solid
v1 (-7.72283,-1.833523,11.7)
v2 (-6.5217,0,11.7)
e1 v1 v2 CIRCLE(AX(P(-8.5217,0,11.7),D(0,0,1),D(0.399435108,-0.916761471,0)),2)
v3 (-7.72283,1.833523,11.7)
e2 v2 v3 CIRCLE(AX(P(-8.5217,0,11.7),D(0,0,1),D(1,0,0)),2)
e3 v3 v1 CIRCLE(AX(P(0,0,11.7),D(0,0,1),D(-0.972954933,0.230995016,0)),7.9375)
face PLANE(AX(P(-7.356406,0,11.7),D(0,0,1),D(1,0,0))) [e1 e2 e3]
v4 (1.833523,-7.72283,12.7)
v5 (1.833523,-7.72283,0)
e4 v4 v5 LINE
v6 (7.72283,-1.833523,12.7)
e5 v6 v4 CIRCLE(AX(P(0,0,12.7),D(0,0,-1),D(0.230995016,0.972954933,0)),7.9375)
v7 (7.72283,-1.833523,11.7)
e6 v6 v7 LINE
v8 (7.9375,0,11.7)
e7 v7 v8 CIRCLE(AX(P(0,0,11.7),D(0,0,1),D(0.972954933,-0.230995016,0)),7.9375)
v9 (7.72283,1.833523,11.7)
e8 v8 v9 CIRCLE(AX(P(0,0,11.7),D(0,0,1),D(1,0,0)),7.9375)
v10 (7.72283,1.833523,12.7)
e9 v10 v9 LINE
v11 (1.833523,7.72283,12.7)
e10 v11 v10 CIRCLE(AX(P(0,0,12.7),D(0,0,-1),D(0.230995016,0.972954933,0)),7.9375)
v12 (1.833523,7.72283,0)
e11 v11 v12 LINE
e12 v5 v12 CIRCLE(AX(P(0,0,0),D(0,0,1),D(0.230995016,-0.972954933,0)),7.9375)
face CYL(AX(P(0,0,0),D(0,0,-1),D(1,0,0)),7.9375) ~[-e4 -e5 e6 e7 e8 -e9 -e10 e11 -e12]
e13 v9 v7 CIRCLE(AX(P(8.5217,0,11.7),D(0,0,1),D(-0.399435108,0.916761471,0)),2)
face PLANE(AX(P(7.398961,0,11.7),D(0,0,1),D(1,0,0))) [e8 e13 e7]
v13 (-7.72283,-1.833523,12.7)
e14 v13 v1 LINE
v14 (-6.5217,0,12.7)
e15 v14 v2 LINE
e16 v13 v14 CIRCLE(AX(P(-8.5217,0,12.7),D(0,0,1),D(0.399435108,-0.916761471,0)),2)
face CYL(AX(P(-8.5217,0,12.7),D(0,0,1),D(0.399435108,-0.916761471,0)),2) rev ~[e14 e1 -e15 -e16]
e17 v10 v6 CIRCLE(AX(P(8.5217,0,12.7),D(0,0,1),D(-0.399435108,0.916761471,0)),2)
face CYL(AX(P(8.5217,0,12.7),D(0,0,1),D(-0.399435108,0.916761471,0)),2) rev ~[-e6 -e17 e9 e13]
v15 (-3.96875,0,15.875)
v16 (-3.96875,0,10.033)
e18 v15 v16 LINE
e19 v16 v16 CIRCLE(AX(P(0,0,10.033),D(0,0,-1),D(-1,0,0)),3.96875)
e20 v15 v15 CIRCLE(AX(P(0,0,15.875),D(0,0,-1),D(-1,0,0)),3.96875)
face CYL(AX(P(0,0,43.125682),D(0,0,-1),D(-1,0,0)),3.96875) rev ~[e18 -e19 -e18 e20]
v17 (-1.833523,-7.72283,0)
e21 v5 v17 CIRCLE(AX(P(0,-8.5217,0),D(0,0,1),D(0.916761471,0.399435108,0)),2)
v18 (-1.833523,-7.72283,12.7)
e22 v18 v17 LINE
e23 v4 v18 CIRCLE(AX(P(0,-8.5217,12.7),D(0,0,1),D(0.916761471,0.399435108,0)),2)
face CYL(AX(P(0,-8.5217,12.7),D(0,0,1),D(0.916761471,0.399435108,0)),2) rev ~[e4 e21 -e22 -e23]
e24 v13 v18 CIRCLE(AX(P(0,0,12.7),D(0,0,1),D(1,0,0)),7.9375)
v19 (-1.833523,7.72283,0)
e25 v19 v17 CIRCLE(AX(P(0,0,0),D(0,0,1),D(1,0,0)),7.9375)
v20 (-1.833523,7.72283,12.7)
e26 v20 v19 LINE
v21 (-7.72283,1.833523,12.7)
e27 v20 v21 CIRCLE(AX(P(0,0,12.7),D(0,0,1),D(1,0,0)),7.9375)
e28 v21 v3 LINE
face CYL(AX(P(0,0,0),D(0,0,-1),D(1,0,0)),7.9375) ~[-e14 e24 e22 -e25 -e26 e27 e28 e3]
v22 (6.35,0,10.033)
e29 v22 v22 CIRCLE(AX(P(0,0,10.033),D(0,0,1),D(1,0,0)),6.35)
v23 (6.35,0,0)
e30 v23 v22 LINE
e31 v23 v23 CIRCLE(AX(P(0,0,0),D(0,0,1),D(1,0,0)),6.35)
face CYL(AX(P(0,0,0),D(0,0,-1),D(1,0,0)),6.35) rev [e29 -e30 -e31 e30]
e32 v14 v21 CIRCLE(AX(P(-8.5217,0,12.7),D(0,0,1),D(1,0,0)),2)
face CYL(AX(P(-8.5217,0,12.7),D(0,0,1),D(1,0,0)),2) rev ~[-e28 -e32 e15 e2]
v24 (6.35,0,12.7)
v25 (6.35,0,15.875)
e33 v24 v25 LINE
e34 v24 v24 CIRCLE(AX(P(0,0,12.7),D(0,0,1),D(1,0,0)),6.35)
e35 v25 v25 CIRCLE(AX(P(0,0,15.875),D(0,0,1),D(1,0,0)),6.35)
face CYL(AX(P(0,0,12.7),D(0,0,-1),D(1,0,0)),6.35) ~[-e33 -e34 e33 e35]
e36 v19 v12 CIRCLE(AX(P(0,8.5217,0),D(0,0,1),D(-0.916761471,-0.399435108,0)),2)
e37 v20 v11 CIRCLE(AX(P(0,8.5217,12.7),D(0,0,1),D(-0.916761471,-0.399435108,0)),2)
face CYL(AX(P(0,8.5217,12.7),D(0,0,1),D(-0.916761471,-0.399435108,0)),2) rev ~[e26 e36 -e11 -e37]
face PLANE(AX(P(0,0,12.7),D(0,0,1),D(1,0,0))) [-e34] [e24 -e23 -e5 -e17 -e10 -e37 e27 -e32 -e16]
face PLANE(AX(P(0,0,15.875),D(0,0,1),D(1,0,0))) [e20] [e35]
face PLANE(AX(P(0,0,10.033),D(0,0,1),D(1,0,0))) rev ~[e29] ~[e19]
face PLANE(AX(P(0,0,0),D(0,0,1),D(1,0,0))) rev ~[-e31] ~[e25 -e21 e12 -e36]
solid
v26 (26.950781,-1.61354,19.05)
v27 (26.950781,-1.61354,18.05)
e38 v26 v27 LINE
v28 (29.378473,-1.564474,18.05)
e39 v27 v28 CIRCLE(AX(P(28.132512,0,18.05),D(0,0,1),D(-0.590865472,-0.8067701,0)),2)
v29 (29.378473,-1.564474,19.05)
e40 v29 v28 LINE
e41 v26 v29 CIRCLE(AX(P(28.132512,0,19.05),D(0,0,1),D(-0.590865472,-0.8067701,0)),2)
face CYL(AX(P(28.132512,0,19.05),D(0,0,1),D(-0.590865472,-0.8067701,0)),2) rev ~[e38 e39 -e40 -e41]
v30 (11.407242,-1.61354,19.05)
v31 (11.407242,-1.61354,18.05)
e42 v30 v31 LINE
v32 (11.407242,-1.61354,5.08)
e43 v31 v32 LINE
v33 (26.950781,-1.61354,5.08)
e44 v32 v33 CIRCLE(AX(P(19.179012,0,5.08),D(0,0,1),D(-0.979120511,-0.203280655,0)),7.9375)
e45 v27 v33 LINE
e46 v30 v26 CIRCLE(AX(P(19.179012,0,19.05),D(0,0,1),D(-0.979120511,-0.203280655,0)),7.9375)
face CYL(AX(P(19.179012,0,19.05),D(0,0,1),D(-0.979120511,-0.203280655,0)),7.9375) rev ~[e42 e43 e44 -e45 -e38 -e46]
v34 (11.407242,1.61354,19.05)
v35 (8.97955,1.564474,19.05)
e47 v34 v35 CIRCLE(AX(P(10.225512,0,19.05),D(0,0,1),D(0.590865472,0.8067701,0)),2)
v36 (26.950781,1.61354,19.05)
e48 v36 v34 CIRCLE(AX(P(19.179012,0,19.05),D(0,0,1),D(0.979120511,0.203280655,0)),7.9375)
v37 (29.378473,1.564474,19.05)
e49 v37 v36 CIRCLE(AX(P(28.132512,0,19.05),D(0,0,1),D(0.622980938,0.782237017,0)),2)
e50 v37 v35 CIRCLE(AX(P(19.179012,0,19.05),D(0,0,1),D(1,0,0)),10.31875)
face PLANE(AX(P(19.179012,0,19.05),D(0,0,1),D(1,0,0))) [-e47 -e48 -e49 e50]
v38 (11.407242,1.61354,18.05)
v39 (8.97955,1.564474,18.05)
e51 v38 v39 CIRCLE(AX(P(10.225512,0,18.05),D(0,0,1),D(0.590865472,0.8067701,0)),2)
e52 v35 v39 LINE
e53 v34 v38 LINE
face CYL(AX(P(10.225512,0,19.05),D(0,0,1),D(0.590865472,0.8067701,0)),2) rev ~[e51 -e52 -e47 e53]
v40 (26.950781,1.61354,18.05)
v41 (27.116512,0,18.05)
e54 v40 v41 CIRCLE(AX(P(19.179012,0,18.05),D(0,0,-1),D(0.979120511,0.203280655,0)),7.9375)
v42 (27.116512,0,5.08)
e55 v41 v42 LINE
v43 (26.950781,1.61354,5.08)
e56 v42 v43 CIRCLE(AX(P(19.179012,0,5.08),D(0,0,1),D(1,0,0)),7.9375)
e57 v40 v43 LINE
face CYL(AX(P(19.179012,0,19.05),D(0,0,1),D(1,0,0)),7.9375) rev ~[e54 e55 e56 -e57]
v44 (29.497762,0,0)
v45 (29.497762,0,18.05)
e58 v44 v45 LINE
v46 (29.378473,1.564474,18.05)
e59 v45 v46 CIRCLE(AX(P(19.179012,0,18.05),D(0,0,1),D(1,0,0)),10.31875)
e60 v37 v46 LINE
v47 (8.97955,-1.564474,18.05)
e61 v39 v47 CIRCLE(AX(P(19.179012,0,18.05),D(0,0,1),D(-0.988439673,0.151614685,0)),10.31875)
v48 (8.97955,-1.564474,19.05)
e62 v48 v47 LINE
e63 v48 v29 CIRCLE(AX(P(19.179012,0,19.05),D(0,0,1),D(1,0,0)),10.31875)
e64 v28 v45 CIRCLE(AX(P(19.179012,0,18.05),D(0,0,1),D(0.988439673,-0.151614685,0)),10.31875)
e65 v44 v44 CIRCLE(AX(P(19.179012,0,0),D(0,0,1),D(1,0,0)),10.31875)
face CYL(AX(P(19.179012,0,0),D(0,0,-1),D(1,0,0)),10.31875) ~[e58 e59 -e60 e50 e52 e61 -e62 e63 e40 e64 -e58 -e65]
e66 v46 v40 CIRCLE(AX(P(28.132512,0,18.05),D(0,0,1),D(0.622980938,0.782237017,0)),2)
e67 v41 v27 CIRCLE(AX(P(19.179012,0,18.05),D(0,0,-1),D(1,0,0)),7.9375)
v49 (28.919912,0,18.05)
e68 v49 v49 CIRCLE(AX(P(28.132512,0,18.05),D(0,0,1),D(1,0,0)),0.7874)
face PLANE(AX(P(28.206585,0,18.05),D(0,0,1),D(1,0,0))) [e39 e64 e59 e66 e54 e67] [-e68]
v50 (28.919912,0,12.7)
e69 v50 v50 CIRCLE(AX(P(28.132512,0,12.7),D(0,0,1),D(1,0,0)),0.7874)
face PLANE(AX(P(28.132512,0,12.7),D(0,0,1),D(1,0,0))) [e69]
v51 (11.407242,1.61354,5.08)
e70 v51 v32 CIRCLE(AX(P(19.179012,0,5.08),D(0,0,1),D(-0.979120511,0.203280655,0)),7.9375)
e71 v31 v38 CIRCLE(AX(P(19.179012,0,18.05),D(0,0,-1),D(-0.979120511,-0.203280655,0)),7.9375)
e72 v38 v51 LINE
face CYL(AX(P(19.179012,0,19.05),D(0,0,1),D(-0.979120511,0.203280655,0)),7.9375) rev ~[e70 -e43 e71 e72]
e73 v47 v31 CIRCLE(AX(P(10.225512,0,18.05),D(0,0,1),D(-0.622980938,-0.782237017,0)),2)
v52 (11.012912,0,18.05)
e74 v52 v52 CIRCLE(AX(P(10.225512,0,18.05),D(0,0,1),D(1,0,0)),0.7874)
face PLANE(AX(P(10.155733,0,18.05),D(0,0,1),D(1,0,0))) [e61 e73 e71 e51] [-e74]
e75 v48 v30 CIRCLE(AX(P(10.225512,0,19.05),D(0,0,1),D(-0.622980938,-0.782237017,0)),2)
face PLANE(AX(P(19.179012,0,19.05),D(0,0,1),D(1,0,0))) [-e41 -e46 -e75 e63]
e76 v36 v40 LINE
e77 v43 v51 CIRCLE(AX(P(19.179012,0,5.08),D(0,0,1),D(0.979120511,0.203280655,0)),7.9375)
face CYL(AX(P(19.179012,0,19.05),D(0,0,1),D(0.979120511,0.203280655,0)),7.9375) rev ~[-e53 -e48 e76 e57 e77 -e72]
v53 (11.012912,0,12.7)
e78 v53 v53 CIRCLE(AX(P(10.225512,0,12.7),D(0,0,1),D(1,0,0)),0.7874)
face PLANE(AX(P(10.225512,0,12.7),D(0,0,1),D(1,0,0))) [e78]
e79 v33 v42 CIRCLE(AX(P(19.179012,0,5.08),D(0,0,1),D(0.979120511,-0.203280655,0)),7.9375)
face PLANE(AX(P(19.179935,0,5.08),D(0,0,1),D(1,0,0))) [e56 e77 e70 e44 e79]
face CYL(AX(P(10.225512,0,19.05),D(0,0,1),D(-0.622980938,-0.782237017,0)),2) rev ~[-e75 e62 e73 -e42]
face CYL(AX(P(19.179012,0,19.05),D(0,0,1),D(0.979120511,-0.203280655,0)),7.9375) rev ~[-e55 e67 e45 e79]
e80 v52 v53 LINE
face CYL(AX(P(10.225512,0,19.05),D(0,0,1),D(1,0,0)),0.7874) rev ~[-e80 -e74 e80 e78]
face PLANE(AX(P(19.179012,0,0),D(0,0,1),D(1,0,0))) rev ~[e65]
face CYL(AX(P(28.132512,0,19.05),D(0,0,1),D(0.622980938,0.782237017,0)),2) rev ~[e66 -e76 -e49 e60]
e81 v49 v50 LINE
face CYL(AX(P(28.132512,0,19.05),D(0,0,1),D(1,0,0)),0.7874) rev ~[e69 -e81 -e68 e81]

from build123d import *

# Parameters (mm, degrees)
F0_R      = 7.9375
F0_R_2    = 6.35
F1_DEPTH  = 12.7
F3_DEPTH  = 12.701
F4_DEPTH  = 1
F2_R      = 6.35
F5_DEPTH  = 3.175
F7_D      = 7.9375
F8_R      = 10.31875
F8_R_2    = 7.9375
F9_DEPTH  = 19.05
F11_DEPTH = 13.97
F10_R     = 0.7874
F12_DEPTH = 6.35
F13_DEPTH = 1
F14_DEPTH = 10.033


with BuildPart() as f1:
    # F0 (on Top) → F1 (new body)
    with BuildSketch(Plane.XY):
        Circle(F0_R)
        Circle(F0_R_2, mode=Mode.SUBTRACT)
        Circle(F0_R_2)
    extrude(amount=F1_DEPTH)

    # F2 (on face) → F3 (cut, through all)
    with BuildSketch(Plane.XY.offset(12.7)):
        with BuildLine():
            ThreePointArc((1.8335229418, 7.722829784), (0, 7.9375), (-1.8335229418, 7.722829784))
            ThreePointArc((-1.8335229418, 7.722829784), (0, 6.5217), (1.8335229418, 7.722829784))
        make_face()
        with BuildLine():
            ThreePointArc((1.8335229418, -7.722829784), (0, -6.5217), (-1.8335229418, -7.722829784))
            ThreePointArc((-1.8335229418, -7.722829784), (0, -7.9375), (1.8335229418, -7.722829784))
        make_face()
    extrude(amount=-F3_DEPTH, mode=Mode.SUBTRACT)

    # F2 (on face) → F4 (cut)
    with BuildSketch(Plane.XY.offset(12.7)):
        with BuildLine():
            ThreePointArc((-6.5217, 0), (-6.8487175685, 1.0959606672), (-7.722829784, 1.8335229418))
            ThreePointArc((-7.722829784, 1.8335229418), (-7.9375, 0), (-7.722829784, -1.8335229418))
            ThreePointArc((-7.722829784, -1.8335229418), (-6.8487175685, -1.0959606672), (-6.5217, 0))
        make_face()
        with BuildLine():
            ThreePointArc((7.9375, 0), (7.8836497785, 0.9230235208), (7.722829784, 1.8335229418))
            ThreePointArc((7.722829784, 1.8335229418), (6.5217, 0), (7.722829784, -1.8335229418))
            ThreePointArc((7.722829784, -1.8335229418), (7.8836497785, -0.9230235208), (7.9375, 0))
        make_face()
    extrude(amount=-F4_DEPTH, mode=Mode.SUBTRACT)

    # F2 (on face) → F5 (join)
    with BuildSketch(Plane.XY.offset(12.7)):
        Circle(F2_R)
    extrude(amount=F5_DEPTH)

    # F7 (through all)
    with Locations(Plane.XY.offset(15.875)):
        with Locations((0, 0)):
            Hole(F7_D / 2)

    # F0 (on Top) → F14 (cut)
    with BuildSketch(Plane.XY):
        Circle(F0_R_2)
    extrude(amount=F14_DEPTH, mode=Mode.SUBTRACT)


with BuildPart() as f9:
    # F8 (on Top) → F9 (new body)
    with BuildSketch(Plane.XY):
        with Locations((19.1790115059, 0)):
            Circle(F8_R)
        with Locations((19.1790115059, 0)):
            Circle(F8_R_2, mode=Mode.SUBTRACT)
        with Locations((19.1790115059, 0)):
            Circle(F8_R_2)
    extrude(amount=F9_DEPTH)

    # F10 (on face) → F11 (cut)
    with BuildSketch(Plane.XY.offset(19.05)):
        with BuildLine():
            ThreePointArc((26.9507805627, -1.6135402003), (27.0749700652, -0.8110145997), (27.1165115059, 0))
            ThreePointArc((27.1165115059, 0), (27.0749700652, 0.8110145997), (26.9507805627, 1.6135402003))
            ThreePointArc((26.9507805627, 1.6135402003), (19.1790115059, 7.9375), (11.4072424492, 1.6135402003))
            ThreePointArc((11.4072424492, 1.6135402003), (11.2415115059, 0), (11.4072424492, -1.6135402003))
            ThreePointArc((11.4072424492, -1.6135402003), (19.1790115059, -7.9375), (26.9507805627, -1.6135402003))
        make_face()
    extrude(amount=-F11_DEPTH, mode=Mode.SUBTRACT)

    # F10 (on face) → F12 (cut)
    with BuildSketch(Plane.XY.offset(19.05)):
        with Locations((10.2255115059, 0)):
            Circle(F10_R)
        with Locations((28.1325115059, 0)):
            Circle(F10_R)
    extrude(amount=-F12_DEPTH, mode=Mode.SUBTRACT)

    # F10 (on face) → F13 (cut)
    with BuildSketch(Plane.XY.offset(19.05)):
        with BuildLine():
            ThreePointArc((11.4072424492, -1.6135402003), (11.2415115059, 0), (11.4072424492, 1.6135402003))
            ThreePointArc((11.4072424492, 1.6135402003), (10.1850977046, 1.9995916395), (8.97954963, 1.5644740342))
            ThreePointArc((8.97954963, 1.5644740342), (8.8602615059, 0), (8.97954963, -1.5644740342))
            ThreePointArc((8.97954963, -1.5644740342), (10.1850977046, -1.9995916395), (11.4072424492, -1.6135402003))
        make_face()
        with Locations((10.2255115059, 0)):
            Circle(F10_R, mode=Mode.SUBTRACT)
        with BuildLine():
            ThreePointArc((26.9507805627, 1.6135402003), (27.0749700652, 0.8110145997), (27.1165115059, 0))
            ThreePointArc((27.1165115059, 0), (27.0749700652, -0.8110145997), (26.9507805627, -1.6135402003))
            ThreePointArc((26.9507805627, -1.6135402003), (28.1729253073, -1.9995916395), (29.3784733819, -1.5644740342))
            ThreePointArc((29.3784733819, -1.5644740342), (29.4678962559, -0.784507594), (29.4977615059, 0))
            ThreePointArc((29.4977615059, 0), (29.4678962559, 0.784507594), (29.3784733819, 1.5644740342))
            ThreePointArc((29.3784733819, 1.5644740342), (28.1729253073, 1.9995916395), (26.9507805627, 1.6135402003))
        make_face()
        with Locations((28.1325115059, 0)):
            Circle(F10_R, mode=Mode.SUBTRACT)
    extrude(amount=-F13_DEPTH, mode=Mode.SUBTRACT)


solid = Compound([f1.part, f9.part])
